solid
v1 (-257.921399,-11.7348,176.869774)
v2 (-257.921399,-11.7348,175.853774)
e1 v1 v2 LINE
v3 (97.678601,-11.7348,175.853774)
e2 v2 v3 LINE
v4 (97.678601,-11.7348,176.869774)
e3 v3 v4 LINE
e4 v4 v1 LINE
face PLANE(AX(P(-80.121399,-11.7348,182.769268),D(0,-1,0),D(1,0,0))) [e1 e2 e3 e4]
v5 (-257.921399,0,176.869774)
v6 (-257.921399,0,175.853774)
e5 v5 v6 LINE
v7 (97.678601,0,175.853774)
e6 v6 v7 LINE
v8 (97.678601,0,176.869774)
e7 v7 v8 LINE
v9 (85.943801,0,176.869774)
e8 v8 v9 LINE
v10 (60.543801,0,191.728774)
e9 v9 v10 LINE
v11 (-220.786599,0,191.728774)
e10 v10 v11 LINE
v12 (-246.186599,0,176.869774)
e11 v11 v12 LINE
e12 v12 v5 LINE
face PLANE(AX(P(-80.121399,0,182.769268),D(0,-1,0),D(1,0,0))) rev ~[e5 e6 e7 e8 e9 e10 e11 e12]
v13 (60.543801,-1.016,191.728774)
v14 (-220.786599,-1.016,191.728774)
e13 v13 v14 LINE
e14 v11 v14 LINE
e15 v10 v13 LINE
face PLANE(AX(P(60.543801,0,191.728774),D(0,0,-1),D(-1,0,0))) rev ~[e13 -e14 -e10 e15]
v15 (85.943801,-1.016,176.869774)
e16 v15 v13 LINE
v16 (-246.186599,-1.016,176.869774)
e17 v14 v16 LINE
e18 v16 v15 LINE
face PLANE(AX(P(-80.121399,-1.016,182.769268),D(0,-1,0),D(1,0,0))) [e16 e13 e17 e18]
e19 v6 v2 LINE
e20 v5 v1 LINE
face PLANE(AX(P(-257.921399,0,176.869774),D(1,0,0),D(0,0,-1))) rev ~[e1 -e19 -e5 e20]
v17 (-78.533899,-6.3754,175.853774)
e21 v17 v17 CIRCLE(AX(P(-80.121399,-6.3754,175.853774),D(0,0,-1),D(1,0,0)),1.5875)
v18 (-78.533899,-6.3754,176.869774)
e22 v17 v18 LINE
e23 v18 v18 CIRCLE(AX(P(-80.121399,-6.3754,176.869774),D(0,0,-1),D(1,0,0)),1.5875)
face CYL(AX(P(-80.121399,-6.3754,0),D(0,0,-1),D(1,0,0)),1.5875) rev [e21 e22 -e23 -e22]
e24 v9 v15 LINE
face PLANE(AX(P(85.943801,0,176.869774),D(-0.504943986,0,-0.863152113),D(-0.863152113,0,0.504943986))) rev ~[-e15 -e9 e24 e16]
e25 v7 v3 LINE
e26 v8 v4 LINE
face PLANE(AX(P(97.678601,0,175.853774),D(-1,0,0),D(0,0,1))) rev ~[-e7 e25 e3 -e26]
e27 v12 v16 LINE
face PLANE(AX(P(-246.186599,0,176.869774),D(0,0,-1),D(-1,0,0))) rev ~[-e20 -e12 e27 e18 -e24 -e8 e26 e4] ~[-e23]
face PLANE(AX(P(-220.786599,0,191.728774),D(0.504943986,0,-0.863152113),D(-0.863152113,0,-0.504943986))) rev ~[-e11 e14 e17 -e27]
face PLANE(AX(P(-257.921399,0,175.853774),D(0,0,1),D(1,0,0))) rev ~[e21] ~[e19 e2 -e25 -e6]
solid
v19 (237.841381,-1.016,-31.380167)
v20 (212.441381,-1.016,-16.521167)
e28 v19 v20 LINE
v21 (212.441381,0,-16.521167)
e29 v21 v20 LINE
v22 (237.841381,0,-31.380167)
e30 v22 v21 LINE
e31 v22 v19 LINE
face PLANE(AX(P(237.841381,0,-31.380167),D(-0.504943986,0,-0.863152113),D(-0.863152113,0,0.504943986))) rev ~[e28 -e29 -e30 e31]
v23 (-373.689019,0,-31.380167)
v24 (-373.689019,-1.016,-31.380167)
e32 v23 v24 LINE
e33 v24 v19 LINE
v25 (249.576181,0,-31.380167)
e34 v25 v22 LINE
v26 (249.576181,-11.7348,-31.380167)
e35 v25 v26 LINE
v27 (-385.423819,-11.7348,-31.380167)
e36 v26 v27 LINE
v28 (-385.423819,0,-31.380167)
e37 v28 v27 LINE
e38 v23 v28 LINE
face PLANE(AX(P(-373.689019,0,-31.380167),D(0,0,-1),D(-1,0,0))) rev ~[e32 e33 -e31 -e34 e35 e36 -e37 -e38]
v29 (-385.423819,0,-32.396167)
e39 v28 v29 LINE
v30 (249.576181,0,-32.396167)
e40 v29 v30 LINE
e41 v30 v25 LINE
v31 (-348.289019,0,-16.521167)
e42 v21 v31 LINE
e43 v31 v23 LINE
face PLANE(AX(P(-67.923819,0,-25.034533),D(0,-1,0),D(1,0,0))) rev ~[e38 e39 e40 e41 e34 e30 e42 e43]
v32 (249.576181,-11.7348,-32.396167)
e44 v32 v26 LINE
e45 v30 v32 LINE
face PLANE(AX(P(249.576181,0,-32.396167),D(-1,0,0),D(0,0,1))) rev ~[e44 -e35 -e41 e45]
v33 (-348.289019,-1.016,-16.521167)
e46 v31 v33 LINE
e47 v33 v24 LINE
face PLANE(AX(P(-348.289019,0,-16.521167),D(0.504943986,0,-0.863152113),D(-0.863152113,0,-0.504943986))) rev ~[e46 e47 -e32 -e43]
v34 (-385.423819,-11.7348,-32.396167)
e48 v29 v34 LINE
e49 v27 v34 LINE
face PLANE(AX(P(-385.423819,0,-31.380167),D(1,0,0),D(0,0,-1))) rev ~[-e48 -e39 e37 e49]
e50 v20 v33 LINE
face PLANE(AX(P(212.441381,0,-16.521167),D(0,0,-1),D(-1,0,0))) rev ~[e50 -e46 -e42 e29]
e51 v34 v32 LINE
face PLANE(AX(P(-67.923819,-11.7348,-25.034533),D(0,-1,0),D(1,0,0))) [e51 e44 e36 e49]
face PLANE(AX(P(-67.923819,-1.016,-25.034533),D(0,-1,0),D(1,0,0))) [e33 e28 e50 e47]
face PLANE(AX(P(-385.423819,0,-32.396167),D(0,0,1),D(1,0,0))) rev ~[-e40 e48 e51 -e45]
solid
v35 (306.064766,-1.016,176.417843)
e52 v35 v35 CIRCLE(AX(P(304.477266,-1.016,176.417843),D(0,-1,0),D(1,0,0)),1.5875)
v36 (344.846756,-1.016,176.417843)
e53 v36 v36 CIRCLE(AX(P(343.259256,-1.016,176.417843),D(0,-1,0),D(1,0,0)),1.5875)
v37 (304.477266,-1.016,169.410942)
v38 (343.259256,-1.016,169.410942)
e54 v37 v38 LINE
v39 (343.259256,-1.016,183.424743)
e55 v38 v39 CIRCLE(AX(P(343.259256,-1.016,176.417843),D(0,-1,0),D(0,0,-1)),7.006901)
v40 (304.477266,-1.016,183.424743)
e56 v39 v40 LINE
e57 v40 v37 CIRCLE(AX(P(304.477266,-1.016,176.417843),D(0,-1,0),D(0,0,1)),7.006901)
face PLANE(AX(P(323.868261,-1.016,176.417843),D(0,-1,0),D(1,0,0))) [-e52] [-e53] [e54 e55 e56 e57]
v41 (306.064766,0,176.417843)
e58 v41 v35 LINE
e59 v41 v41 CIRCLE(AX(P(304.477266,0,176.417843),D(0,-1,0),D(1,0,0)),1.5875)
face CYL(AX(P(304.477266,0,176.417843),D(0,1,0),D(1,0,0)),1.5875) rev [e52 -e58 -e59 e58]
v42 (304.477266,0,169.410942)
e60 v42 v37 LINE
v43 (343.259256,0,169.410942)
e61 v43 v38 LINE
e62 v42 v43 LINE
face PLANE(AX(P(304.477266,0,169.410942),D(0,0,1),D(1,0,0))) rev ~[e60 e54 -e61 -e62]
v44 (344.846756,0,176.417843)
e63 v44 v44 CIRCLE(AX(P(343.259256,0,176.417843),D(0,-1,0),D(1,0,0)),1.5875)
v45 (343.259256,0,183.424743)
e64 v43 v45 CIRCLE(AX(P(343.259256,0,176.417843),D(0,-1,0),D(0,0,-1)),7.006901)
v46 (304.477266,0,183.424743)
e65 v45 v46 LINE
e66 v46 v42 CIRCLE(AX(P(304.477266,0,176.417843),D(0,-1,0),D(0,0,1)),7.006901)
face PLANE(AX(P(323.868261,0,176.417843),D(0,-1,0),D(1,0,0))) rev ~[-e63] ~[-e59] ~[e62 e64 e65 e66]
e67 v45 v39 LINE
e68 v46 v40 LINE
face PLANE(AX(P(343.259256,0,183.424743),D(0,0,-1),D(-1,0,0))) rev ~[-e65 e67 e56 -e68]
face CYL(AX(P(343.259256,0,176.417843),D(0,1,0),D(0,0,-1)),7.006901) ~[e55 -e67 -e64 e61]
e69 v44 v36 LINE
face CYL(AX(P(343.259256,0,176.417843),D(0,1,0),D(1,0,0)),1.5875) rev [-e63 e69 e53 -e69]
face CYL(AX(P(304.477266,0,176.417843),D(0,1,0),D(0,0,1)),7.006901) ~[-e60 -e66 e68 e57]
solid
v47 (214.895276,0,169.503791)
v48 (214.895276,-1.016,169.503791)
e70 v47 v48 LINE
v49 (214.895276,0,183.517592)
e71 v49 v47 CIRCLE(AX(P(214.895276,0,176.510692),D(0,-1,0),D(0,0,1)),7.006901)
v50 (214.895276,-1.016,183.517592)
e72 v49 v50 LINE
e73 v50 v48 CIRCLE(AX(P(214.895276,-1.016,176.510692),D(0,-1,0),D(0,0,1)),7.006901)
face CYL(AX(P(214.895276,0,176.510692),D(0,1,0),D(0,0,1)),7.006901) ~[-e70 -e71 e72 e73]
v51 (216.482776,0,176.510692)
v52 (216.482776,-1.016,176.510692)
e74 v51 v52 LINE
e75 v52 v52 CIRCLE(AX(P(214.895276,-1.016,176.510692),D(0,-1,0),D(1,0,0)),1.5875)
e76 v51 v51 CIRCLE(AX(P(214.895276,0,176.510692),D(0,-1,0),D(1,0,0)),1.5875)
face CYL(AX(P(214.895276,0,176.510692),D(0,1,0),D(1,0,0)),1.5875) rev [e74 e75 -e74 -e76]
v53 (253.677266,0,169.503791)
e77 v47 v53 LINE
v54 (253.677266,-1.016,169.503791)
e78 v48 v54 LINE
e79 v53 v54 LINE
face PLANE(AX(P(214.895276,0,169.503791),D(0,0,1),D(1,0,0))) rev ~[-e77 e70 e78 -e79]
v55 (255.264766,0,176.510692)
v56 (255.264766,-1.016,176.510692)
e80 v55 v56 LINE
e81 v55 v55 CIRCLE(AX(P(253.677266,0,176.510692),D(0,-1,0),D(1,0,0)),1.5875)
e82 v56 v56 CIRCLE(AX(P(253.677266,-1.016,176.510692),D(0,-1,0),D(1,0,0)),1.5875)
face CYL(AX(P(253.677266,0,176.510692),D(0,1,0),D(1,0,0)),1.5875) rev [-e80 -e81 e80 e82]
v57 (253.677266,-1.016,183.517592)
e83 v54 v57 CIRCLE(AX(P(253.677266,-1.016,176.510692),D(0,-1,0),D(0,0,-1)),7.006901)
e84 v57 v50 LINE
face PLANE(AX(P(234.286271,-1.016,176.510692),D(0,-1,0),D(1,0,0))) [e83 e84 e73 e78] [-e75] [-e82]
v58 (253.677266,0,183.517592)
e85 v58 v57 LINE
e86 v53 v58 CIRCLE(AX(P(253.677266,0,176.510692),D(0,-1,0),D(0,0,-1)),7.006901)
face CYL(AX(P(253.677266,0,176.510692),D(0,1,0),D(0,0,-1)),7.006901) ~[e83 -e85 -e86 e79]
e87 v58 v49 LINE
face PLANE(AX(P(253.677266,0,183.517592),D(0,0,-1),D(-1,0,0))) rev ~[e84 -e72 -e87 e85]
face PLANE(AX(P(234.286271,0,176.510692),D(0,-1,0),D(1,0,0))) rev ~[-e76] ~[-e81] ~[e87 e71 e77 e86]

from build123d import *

# Parameters (mm, degrees)
F1_DEPTH = 11.7348
F2_R     = 1.5875
F3_DEPTH = 1.016
F4_T     = 1.016
F5_T     = 1.016
F6_R     = 1.5875
F7_DEPTH = 228.6


# Not quite as in the source:
# - a shell that OpenCascade refuses in one call is made with other operations: the cavity is built on its own and cut out


with BuildPart() as f1:
    # F0 (on Front) → F1 (new body)
    with BuildSketch(Plane.XZ):
        Polygon((-385.423819233, -32.3961665051), (-373.689019233, -32.3961665051), (237.841380767, -32.3961665051), (249.576180767, -32.3961665051), (249.576180767, -31.3801665051), (237.841380767, -31.3801665051), (212.441380767, -16.5211665051), (-348.289019233, -16.5211665051), (-373.689019233, -31.3801665051), (-385.423819233, -31.3801665051), align=None)
    extrude(amount=F1_DEPTH)

    # F4: shell of thickness 1.016, made by hand


with BuildPart() as f1b:
    # F0 (on Front) → F1, piece 2 (new body)
    with BuildSketch(Plane.XZ):
        Polygon((-257.9213991354, 175.8537739515), (-246.1865991354, 175.8537739515), (85.9438008646, 175.8537739515), (97.6786008646, 175.8537739515), (97.6786008646, 176.8697739515), (85.9438008646, 176.8697739515), (60.5438008646, 191.7287739515), (-220.7865991354, 191.7287739515), (-246.1865991354, 176.8697739515), (-257.9213991354, 176.8697739515), align=None)
    extrude(amount=F1_DEPTH)

    # F5: shell of thickness 1.016, made by hand


with BuildPart() as f3:
    # F2 (on Front) → F3 (new body)
    with BuildSketch(Plane.XZ):
        with BuildLine():
            Line((253.6772660458, 183.5175923166), (214.8952760458, 183.5175923166))
            ThreePointArc((214.8952760458, 183.5175923166), (207.888375372, 176.5106916428), (214.8952760458, 169.503790969))
            Line((214.8952760458, 169.503790969), (253.6772660458, 169.503790969))
            ThreePointArc((253.6772660458, 169.503790969), (260.6841667196, 176.5106916428), (253.6772660458, 183.5175923166))
        make_face()
        with Locations((214.8952760458, 176.5106916428)):
            Circle(F2_R, mode=Mode.SUBTRACT)
        with Locations((253.6772660458, 176.5106916428)):
            Circle(F2_R, mode=Mode.SUBTRACT)
    extrude(amount=F3_DEPTH)


with BuildPart() as f3b:
    # F2 (on Front) → F3, piece 2 (new body)
    with BuildSketch(Plane.XZ):
        with BuildLine():
            Line((343.2592560458, 183.4247431812), (304.4772660458, 183.4247431812))
            ThreePointArc((304.4772660458, 183.4247431812), (297.470365372, 176.4178425074), (304.4772660458, 169.4109418336))
            Line((304.4772660458, 169.4109418336), (343.2592560458, 169.4109418336))
            ThreePointArc((343.2592560458, 169.4109418336), (350.2661567196, 176.4178425074), (343.2592560458, 183.4247431812))
        make_face()
        with Locations((304.4772660458, 176.4178425074)):
            Circle(F2_R, mode=Mode.SUBTRACT)
        with Locations((343.2592560458, 176.4178425074)):
            Circle(F2_R, mode=Mode.SUBTRACT)
    extrude(amount=F3_DEPTH)


with BuildPart() as f4_core1:
    # F4_t2: copy of F1
    add(f1.part)

    # the walls: a layer under each face that stays
    f4_faces = [f4_core1.faces().sort_by_distance(p)[0] for p in [
        (-67.923819233, -5.8674, -32.3961665051),
        (-67.923819233, 0, -24.4586665051),
        (-379.556419233, -5.8674, -31.3801665051),
        (243.708780767, -5.8674, -31.3801665051),
        (249.576180767, -5.8674, -31.8881665051),
        (-385.423819233, -5.8674, -31.8881665051),
    ]]
    thicken(f4_faces, amount=-F4_T, mode=Mode.SUBTRACT)


with BuildPart() as f1_1:
    add(f1.part)

    # what is left inside the walls is the cavity
    f4_cavity = [f4_core1.part.solids().sort_by_distance(p)[0] for p in [
        (-67.923819, -1.02616, -26.427167),
    ]]
    add(f4_cavity, mode=Mode.SUBTRACT)


with BuildPart() as f5_core1:
    # F5_t2: copy of F1b
    add(f1b.part)

    # the walls: a layer under each face that stays
    f5_faces = [f5_core1.faces().sort_by_distance(p)[0] for p in [
        (-80.1213991354, -5.8674, 175.8537739515),
        (-80.1213991354, 0, 183.7912739515),
        (-252.0539991354, -5.8674, 176.8697739515),
        (91.8112008646, -5.8674, 176.8697739515),
        (97.6786008646, -5.8674, 176.3617739515),
        (-257.9213991354, -5.8674, 176.3617739515),
    ]]
    thicken(f5_faces, amount=-F5_T, mode=Mode.SUBTRACT)


with BuildPart() as f1b_1:
    add(f1b.part)

    # what is left inside the walls is the cavity
    f5_cavity = [f5_core1.part.solids().sort_by_distance(p)[0] for p in [
        (-80.121399, -1.02616, 181.822774),
    ]]
    add(f5_cavity, mode=Mode.SUBTRACT)

    # F6 (on Top) → F7 (cut)
    with BuildSketch(Plane.XY):
        with Locations((-80.1213991354, -6.3754)):
            Circle(F6_R)
    extrude(amount=F7_DEPTH, mode=Mode.SUBTRACT)


solid = Compound([f3.part, f3b.part, f1_1.part, f1b_1.part])
